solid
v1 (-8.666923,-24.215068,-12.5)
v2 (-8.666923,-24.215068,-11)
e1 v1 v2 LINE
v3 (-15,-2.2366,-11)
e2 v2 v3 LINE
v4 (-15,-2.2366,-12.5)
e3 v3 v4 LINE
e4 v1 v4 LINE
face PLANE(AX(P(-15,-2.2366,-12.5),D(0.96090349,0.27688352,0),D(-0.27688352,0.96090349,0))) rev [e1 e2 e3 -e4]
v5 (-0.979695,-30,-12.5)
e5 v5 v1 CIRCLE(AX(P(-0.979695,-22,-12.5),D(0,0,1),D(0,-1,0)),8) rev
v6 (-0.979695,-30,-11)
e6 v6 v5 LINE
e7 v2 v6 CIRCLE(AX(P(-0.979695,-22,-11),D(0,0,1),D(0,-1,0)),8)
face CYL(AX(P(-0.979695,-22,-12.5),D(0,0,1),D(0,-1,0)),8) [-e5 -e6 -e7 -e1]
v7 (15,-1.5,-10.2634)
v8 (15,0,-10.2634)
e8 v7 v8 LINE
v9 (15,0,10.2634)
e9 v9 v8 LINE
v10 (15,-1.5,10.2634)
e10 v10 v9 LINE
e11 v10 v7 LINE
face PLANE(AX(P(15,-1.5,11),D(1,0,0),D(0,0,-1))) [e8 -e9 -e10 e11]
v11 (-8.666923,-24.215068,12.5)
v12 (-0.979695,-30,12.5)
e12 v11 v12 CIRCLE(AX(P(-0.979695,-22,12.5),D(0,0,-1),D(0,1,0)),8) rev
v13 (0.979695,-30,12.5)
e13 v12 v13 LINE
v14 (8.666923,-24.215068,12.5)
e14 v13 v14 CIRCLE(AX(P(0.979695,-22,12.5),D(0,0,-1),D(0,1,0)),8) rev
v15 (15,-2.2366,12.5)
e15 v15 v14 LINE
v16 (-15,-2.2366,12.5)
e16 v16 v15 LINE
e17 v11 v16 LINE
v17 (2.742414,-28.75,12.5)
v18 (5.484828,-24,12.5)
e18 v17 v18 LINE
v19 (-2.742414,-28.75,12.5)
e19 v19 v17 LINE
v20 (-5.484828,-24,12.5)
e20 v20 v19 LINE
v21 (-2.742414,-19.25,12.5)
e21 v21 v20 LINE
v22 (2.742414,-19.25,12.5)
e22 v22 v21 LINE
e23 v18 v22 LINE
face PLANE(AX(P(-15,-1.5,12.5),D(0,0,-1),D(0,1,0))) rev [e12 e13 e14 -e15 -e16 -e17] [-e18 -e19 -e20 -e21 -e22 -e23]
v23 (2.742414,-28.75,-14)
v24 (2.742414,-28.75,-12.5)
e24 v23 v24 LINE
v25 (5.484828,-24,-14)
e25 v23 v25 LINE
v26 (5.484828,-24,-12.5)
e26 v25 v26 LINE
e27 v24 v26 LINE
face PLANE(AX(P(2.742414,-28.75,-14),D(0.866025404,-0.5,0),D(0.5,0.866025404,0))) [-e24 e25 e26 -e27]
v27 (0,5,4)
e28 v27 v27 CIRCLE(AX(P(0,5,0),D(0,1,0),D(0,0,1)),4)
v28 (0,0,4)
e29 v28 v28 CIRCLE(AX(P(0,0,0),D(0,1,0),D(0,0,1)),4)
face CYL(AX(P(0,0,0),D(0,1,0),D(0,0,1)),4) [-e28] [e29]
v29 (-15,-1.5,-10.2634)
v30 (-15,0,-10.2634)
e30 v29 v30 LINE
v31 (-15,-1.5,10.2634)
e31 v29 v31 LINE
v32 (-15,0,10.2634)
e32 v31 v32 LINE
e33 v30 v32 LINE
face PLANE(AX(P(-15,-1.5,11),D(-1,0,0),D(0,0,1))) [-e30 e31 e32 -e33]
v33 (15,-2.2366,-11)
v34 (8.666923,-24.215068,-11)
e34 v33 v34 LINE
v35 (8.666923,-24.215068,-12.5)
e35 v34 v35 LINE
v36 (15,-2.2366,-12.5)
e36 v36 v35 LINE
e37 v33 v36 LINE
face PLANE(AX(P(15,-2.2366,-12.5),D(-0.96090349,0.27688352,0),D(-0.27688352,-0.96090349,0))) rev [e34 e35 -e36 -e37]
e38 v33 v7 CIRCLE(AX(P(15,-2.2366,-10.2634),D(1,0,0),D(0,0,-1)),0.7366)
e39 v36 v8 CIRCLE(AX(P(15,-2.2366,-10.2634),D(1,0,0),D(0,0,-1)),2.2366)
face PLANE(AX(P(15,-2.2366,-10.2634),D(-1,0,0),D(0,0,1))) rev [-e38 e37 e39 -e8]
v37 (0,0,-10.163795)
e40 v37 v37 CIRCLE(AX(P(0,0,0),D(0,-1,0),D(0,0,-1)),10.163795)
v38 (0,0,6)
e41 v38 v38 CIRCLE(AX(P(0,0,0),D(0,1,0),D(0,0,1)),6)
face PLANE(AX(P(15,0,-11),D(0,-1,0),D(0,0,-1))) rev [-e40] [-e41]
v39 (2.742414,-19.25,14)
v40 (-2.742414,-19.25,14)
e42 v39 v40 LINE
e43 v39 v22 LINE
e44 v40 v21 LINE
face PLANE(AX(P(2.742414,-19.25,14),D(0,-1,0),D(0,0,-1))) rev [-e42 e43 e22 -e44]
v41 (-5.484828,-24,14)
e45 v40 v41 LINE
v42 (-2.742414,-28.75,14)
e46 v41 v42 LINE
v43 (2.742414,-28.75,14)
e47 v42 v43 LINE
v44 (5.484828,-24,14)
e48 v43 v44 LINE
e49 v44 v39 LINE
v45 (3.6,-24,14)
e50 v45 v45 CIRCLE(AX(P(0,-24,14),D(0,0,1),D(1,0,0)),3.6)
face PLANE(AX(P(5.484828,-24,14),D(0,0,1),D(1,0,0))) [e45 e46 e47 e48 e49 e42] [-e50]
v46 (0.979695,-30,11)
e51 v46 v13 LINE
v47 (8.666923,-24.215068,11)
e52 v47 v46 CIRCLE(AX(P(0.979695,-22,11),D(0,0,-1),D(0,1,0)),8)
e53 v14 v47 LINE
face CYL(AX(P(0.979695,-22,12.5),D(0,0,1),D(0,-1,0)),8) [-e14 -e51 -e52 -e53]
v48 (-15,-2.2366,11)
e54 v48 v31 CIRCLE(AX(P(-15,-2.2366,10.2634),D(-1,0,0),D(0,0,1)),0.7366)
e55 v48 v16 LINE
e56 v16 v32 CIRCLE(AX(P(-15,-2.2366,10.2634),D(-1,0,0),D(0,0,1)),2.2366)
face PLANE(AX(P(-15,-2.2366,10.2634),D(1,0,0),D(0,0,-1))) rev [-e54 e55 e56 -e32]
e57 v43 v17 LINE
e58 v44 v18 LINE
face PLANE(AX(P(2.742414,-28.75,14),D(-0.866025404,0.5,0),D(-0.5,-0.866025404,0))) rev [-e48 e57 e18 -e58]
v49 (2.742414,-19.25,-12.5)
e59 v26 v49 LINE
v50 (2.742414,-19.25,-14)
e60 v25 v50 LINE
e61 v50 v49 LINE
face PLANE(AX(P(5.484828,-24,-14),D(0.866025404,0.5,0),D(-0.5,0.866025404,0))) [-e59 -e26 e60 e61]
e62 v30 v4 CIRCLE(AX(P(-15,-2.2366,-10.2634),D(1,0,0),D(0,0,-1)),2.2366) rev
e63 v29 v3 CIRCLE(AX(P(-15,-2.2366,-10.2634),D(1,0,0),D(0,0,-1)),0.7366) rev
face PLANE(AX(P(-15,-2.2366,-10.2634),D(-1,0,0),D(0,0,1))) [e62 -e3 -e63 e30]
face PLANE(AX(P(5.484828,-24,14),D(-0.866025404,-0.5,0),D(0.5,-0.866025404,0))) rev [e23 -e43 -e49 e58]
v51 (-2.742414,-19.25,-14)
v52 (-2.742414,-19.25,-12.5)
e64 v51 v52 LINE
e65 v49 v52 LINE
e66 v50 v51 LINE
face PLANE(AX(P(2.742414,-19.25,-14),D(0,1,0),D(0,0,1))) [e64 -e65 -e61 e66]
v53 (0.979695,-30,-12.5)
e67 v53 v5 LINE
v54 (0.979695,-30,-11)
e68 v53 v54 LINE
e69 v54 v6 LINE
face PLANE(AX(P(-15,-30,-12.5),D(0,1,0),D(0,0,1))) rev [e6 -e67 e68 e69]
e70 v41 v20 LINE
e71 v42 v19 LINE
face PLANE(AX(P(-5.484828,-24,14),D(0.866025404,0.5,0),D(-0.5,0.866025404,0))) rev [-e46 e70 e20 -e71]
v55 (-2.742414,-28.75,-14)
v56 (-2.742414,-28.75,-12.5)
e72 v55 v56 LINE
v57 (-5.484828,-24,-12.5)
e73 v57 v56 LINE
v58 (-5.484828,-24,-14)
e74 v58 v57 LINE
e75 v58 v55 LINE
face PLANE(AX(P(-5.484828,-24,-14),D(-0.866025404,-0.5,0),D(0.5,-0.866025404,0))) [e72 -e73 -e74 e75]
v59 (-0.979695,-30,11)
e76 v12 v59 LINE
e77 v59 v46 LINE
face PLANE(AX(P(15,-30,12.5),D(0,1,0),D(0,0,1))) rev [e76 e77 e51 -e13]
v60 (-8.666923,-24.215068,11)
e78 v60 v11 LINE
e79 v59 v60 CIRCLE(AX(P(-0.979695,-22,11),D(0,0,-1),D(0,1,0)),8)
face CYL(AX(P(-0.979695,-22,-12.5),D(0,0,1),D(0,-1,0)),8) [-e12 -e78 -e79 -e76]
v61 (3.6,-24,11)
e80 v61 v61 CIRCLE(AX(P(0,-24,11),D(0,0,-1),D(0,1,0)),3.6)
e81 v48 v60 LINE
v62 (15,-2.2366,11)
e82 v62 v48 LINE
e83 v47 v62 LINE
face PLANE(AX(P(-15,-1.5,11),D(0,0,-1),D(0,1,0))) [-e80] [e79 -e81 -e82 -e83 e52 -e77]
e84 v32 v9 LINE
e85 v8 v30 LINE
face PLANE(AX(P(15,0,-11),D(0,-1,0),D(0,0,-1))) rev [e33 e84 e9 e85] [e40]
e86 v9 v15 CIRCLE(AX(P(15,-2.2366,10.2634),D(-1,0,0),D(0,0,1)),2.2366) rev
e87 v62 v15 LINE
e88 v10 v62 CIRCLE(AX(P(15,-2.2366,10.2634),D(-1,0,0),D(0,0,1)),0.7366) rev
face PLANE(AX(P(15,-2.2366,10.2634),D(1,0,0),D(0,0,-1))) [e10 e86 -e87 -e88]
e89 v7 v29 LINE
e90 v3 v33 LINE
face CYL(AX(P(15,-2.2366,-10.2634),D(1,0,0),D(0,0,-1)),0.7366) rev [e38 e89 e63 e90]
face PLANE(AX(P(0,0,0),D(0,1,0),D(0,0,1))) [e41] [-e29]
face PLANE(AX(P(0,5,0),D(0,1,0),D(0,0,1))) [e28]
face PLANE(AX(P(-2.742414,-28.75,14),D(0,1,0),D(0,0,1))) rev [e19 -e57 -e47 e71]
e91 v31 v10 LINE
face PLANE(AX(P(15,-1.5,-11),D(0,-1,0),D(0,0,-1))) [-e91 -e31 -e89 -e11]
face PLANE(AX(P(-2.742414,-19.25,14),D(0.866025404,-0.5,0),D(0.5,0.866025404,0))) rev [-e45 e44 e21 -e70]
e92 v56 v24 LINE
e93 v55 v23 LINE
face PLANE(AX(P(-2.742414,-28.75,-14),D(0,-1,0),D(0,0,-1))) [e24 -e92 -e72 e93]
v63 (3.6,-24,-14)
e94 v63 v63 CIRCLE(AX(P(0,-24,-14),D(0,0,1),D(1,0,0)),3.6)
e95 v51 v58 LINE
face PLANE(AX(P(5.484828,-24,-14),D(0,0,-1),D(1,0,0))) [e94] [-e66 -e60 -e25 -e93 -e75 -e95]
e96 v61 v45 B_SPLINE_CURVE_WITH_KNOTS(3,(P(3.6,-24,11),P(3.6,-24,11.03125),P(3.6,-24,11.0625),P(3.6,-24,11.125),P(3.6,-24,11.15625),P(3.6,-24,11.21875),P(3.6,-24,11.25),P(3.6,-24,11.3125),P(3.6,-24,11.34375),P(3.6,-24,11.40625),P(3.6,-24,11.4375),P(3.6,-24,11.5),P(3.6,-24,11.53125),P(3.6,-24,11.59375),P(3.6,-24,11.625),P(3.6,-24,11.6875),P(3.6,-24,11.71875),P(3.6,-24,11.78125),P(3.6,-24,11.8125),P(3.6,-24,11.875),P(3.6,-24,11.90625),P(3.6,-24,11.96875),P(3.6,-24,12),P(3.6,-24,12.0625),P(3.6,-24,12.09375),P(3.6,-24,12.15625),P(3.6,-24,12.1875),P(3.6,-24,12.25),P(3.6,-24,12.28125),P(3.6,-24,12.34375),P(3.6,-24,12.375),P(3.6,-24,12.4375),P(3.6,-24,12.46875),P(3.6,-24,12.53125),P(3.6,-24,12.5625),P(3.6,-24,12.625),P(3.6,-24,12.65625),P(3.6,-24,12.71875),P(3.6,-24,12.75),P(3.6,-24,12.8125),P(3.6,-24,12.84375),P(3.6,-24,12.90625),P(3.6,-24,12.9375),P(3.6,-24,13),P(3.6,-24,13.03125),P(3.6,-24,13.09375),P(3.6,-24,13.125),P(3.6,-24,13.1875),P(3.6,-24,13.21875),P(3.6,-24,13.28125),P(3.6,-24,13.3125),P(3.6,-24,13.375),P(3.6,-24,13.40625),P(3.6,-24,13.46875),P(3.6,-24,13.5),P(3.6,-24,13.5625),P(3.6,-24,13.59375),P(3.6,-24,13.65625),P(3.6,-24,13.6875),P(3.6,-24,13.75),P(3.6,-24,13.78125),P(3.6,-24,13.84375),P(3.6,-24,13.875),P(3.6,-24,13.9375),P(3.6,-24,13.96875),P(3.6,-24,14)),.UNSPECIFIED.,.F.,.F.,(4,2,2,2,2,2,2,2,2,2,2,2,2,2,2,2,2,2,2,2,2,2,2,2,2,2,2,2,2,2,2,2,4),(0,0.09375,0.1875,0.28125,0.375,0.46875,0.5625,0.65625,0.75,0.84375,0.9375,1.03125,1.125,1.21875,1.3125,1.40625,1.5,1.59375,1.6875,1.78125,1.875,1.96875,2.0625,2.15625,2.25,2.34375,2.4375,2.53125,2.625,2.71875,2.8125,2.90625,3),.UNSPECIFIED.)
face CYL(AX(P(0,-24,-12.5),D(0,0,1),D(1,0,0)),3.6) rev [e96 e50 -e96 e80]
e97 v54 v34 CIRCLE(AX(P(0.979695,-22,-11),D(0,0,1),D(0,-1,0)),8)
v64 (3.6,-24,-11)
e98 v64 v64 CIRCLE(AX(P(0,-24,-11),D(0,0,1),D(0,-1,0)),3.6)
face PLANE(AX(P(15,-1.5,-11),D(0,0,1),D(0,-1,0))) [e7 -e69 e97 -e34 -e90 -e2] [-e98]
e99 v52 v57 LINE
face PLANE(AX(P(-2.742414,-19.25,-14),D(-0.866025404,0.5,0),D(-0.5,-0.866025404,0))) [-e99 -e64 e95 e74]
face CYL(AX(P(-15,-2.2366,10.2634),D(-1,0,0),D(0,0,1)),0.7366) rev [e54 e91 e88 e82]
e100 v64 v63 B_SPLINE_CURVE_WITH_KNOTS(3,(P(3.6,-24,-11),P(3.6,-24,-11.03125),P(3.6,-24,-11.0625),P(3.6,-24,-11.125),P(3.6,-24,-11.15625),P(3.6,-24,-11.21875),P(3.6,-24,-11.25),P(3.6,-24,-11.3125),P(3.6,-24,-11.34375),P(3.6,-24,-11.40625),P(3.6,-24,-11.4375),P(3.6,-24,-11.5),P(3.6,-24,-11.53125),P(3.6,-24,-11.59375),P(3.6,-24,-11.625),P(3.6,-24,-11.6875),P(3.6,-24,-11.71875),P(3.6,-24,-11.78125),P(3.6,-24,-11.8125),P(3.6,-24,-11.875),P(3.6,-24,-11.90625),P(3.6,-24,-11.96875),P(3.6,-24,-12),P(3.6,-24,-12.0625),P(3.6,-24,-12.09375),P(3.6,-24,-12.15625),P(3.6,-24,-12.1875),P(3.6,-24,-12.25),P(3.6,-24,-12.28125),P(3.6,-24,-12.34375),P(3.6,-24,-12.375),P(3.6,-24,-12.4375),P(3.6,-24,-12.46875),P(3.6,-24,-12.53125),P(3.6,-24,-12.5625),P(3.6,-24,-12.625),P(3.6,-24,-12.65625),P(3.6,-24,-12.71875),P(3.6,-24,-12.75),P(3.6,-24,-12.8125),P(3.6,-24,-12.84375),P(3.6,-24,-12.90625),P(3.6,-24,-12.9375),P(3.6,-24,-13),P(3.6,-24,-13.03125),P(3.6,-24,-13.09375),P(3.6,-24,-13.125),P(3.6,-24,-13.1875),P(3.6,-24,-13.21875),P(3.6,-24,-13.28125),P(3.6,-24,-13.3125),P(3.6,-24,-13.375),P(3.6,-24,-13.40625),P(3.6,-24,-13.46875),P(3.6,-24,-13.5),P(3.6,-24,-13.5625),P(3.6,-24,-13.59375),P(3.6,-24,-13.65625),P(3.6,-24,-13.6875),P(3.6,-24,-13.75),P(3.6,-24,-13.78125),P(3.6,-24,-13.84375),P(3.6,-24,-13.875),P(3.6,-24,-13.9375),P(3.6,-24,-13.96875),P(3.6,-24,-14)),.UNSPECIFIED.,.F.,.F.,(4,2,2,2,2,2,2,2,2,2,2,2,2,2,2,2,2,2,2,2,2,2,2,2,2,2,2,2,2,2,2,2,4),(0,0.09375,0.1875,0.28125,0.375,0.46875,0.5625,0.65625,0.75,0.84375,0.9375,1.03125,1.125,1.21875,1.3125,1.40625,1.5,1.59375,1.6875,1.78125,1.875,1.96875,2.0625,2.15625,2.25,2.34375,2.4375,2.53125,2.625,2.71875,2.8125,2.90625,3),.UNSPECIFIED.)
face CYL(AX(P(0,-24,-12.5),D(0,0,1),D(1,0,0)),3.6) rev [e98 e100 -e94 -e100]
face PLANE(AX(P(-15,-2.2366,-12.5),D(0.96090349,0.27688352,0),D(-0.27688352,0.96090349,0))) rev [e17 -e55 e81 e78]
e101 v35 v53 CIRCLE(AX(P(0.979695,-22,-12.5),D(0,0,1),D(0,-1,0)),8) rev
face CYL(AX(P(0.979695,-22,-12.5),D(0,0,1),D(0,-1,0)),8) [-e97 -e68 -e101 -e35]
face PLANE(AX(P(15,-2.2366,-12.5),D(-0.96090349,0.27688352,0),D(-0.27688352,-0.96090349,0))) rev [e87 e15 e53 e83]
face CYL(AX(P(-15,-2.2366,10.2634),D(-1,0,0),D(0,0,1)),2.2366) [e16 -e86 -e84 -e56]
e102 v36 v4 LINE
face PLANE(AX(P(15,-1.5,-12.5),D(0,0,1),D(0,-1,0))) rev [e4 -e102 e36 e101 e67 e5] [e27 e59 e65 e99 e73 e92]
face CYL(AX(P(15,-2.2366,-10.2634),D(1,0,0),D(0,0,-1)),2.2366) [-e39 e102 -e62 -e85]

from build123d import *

# Parameters (mm, degrees)
SKETCH1_W                      = 30
SKETCH1_H                      = 22
BASE_FLANGE1_DEPTH             = 1.5
EDGE_FLANGE1_STRIP_W           = 7.4732
EDGE_FLANGE1_STRIP_H           = 1.5
EDGE_FLANGE1_STRIP_CUT_DEPTH   = 30
EDGE_FLANGE1_STRIP_2_W         = 7.4732
EDGE_FLANGE1_STRIP_2_H         = 1.5
EDGE_FLANGE1_STRIP_CUT_2_DEPTH = 30
EDGE_FLANGE1_DEPTH             = 30
EDGE_FLANGE1_BEND_DEPTH        = 30
CUT_EXTRUDE1_DEPTH             = 42.833001327
FILLET1_R                      = 8
SKETCH12_R                     = 3.6
CUT_EXTRUDE2_DEPTH             = 42.833001327
BOSS_EXTRUDE1_START            = 1.5
SKETCH13_R                     = 3.6
BOSS_EXTRUDE1_DEPTH            = 1.5
SKETCH14_R                     = 6
BOSS_EXTRUDE2_DEPTH            = 1
SKETCH15_R                     = 10
BOSS_EXTRUDE3_DEPTH            = 4
FILLET2_R                      = 2
SKETCH16_R                     = 4
BOSS_EXTRUDE4_DEPTH            = 5
CUT_EXTRUDE4_START             = -10
SKETCH17_R                     = 10.163794577
SKETCH17_R_2                   = 4
CUT_EXTRUDE4_DEPTH             = 10
CUT_EXTRUDE5_START             = -5
SKETCH18_R                     = 4
CUT_EXTRUDE5_DEPTH             = 5


# Sheet-metal steps are written as plain solids
with BuildPart() as part:
    # Sketch1 → Base-Flange1 (new body)
    with BuildSketch(Plane(origin=(0, 0, 0), x_dir=(1, 0, 0), z_dir=(0, 1, 0))):
        Rectangle(SKETCH1_W, SKETCH1_H)
    extrude(amount=-BASE_FLANGE1_DEPTH)

    # Edge-Flange1 strip (across the edge) → Edge-Flange1 strip cut (cut)
    with BuildSketch(Plane(origin=(15, -1.5, 11), x_dir=(0, 0, -1), z_dir=(-1, 0, 0))):
        with Locations((-3, -0.75)):
            Rectangle(EDGE_FLANGE1_STRIP_W, EDGE_FLANGE1_STRIP_H)
    extrude(amount=EDGE_FLANGE1_STRIP_CUT_DEPTH, mode=Mode.SUBTRACT)

    # Edge-Flange1 strip 2 (across the edge) → Edge-Flange1 strip cut 2 (cut)
    with BuildSketch(Plane(origin=(-15, -1.5, -11), x_dir=(0, 0, 1), z_dir=(1, 0, 0))):
        with Locations((-3, -0.75)):
            Rectangle(EDGE_FLANGE1_STRIP_2_W, EDGE_FLANGE1_STRIP_2_H)
    extrude(amount=EDGE_FLANGE1_STRIP_CUT_2_DEPTH, mode=Mode.SUBTRACT)

    # Edge-Flange1 section (across the edge) → Edge-Flange1 (add)
    with BuildSketch(Plane(origin=(15, -1.5, 11), x_dir=(0, 0, -1), z_dir=(-1, 0, 0))):
        with BuildLine():
            Line((-1.5, 0.7366), (-1.5, 28.5))
            Line((-1.5, 28.5), (0, 28.5))
            Line((0, 28.5), (0, 0.7366))
            ThreePointArc((0, 0.7366), (0.215745145, 0.215745145), (0.7366, 0))
            Line((0.7366, 0), (0.7366, -1.5))
            ThreePointArc((0.7366, -1.5), (-0.844915027, -0.844915027), (-1.5, 0.7366))
        make_face()
    extrude(amount=EDGE_FLANGE1_DEPTH)

    # Edge-Flange1 section 2 (across the edge) → Edge-Flange1 bend (add)
    with BuildSketch(Plane(origin=(-15, -1.5, -11), x_dir=(0, 0, 1), z_dir=(1, 0, 0))):
        with BuildLine():
            Line((-1.5, 0.7366), (-1.5, 28.5))
            Line((-1.5, 28.5), (0, 28.5))
            Line((0, 28.5), (0, 0.7366))
            ThreePointArc((0, 0.7366), (0.215745145, 0.215745145), (0.7366, 0))
            Line((0.7366, 0), (0.7366, -1.5))
            ThreePointArc((0.7366, -1.5), (-0.844915027, -0.844915027), (-1.5, 0.7366))
        make_face()
    extrude(amount=EDGE_FLANGE1_BEND_DEPTH)

    # Sketch11 → Cut-Extrude1 (cut, through all)
    with BuildSketch(Plane.XY.offset(12.5)):
        Polygon((-15, -2.2366), (-7, -30), (-15, -30), align=None)
        Polygon((15, -2.2366), (7, -30), (15, -30), align=None)
    extrude(amount=-CUT_EXTRUDE1_DEPTH, mode=Mode.SUBTRACT)

    # Fillet1
    fillet1_edges = [part.edges().sort_by_distance(p)[0] for p in [
        (7, -30, 11.75),
        (7, -30, -11.75),
        (-7, -30, 11.75),
        (-7, -30, -11.75),
    ]]
    fillet(fillet1_edges, radius=FILLET1_R)

    # Sketch12 → Cut-Extrude2 (cut, through all)
    with BuildSketch(Plane.XY.offset(12.5)):
        with Locations((0, -24)):
            Circle(SKETCH12_R)
    extrude(amount=-CUT_EXTRUDE2_DEPTH, mode=Mode.SUBTRACT)

    # Sketch13 → Boss-Extrude1 (add)
    with BuildSketch(Plane.XY.offset(12.5).offset(BOSS_EXTRUDE1_START)):
        Polygon((5.484827557, -24), (2.742413779, -19.25), (-2.742413779, -19.25), (-5.484827557, -24), (-2.742413779, -28.75), (2.742413779, -28.75), align=None)
        with Locations((0, -24)):
            Circle(SKETCH13_R, mode=Mode.SUBTRACT)
    boss_extrude1 = extrude(amount=-BOSS_EXTRUDE1_DEPTH)

    # Mirror1: Boss-Extrude1 across plane
    add(boss_extrude1.mirror(Plane.XY))

    # Sketch14 → Boss-Extrude2 (add)
    with BuildSketch(Plane(origin=(0, 0, 0), x_dir=(1, 0, 0), z_dir=(0, 1, 0))):
        with Locations(Location((0, 0, 0), (0, 0, 90))):
            Circle(SKETCH14_R)
    extrude(amount=BOSS_EXTRUDE2_DEPTH)

    # Sketch15 → Boss-Extrude3 (add)
    with BuildSketch(Plane(origin=(0, 1, 0), x_dir=(1, 0, 0), z_dir=(0, 1, 0))):
        with Locations(Location((0, 0, 0), (0, 0, 270))):
            Circle(SKETCH15_R)
    extrude(amount=BOSS_EXTRUDE3_DEPTH)

    # Fillet2
    fillet2_edges = [part.edges().sort_by_distance(p)[0] for p in [
        (0, 1, -10),
    ]]
    fillet(fillet2_edges, radius=FILLET2_R)

    # Sketch16 → Boss-Extrude4 (add)
    with BuildSketch(Plane(origin=(0, 5, 0), x_dir=(1, 0, 0), z_dir=(0, 1, 0))):
        with Locations(Location((0, 0, 0), (0, 0, 270))):
            Circle(SKETCH16_R)
    extrude(amount=BOSS_EXTRUDE4_DEPTH)

    # Sketch17 → Cut-Extrude4 (cut)
    with BuildSketch(Plane(origin=(0, 10, 0), x_dir=(1, 0, 0), z_dir=(0, 1, 0)).offset(CUT_EXTRUDE4_START)):
        Circle(SKETCH17_R)
        with Locations(Location((0, 0, 0), (0, 0, 270))):
            Circle(SKETCH17_R_2, mode=Mode.SUBTRACT)
    extrude(amount=CUT_EXTRUDE4_DEPTH, mode=Mode.SUBTRACT)

    # Sketch18 → Cut-Extrude5 (cut)
    with BuildSketch(Plane(origin=(0, 10, 0), x_dir=(1, 0, 0), z_dir=(0, 1, 0)).offset(CUT_EXTRUDE5_START)):
        with Locations(Location((0, 0, 0), (0, 0, 270))):
            Circle(SKETCH18_R)
    extrude(amount=CUT_EXTRUDE5_DEPTH, mode=Mode.SUBTRACT)


solid = part.part
